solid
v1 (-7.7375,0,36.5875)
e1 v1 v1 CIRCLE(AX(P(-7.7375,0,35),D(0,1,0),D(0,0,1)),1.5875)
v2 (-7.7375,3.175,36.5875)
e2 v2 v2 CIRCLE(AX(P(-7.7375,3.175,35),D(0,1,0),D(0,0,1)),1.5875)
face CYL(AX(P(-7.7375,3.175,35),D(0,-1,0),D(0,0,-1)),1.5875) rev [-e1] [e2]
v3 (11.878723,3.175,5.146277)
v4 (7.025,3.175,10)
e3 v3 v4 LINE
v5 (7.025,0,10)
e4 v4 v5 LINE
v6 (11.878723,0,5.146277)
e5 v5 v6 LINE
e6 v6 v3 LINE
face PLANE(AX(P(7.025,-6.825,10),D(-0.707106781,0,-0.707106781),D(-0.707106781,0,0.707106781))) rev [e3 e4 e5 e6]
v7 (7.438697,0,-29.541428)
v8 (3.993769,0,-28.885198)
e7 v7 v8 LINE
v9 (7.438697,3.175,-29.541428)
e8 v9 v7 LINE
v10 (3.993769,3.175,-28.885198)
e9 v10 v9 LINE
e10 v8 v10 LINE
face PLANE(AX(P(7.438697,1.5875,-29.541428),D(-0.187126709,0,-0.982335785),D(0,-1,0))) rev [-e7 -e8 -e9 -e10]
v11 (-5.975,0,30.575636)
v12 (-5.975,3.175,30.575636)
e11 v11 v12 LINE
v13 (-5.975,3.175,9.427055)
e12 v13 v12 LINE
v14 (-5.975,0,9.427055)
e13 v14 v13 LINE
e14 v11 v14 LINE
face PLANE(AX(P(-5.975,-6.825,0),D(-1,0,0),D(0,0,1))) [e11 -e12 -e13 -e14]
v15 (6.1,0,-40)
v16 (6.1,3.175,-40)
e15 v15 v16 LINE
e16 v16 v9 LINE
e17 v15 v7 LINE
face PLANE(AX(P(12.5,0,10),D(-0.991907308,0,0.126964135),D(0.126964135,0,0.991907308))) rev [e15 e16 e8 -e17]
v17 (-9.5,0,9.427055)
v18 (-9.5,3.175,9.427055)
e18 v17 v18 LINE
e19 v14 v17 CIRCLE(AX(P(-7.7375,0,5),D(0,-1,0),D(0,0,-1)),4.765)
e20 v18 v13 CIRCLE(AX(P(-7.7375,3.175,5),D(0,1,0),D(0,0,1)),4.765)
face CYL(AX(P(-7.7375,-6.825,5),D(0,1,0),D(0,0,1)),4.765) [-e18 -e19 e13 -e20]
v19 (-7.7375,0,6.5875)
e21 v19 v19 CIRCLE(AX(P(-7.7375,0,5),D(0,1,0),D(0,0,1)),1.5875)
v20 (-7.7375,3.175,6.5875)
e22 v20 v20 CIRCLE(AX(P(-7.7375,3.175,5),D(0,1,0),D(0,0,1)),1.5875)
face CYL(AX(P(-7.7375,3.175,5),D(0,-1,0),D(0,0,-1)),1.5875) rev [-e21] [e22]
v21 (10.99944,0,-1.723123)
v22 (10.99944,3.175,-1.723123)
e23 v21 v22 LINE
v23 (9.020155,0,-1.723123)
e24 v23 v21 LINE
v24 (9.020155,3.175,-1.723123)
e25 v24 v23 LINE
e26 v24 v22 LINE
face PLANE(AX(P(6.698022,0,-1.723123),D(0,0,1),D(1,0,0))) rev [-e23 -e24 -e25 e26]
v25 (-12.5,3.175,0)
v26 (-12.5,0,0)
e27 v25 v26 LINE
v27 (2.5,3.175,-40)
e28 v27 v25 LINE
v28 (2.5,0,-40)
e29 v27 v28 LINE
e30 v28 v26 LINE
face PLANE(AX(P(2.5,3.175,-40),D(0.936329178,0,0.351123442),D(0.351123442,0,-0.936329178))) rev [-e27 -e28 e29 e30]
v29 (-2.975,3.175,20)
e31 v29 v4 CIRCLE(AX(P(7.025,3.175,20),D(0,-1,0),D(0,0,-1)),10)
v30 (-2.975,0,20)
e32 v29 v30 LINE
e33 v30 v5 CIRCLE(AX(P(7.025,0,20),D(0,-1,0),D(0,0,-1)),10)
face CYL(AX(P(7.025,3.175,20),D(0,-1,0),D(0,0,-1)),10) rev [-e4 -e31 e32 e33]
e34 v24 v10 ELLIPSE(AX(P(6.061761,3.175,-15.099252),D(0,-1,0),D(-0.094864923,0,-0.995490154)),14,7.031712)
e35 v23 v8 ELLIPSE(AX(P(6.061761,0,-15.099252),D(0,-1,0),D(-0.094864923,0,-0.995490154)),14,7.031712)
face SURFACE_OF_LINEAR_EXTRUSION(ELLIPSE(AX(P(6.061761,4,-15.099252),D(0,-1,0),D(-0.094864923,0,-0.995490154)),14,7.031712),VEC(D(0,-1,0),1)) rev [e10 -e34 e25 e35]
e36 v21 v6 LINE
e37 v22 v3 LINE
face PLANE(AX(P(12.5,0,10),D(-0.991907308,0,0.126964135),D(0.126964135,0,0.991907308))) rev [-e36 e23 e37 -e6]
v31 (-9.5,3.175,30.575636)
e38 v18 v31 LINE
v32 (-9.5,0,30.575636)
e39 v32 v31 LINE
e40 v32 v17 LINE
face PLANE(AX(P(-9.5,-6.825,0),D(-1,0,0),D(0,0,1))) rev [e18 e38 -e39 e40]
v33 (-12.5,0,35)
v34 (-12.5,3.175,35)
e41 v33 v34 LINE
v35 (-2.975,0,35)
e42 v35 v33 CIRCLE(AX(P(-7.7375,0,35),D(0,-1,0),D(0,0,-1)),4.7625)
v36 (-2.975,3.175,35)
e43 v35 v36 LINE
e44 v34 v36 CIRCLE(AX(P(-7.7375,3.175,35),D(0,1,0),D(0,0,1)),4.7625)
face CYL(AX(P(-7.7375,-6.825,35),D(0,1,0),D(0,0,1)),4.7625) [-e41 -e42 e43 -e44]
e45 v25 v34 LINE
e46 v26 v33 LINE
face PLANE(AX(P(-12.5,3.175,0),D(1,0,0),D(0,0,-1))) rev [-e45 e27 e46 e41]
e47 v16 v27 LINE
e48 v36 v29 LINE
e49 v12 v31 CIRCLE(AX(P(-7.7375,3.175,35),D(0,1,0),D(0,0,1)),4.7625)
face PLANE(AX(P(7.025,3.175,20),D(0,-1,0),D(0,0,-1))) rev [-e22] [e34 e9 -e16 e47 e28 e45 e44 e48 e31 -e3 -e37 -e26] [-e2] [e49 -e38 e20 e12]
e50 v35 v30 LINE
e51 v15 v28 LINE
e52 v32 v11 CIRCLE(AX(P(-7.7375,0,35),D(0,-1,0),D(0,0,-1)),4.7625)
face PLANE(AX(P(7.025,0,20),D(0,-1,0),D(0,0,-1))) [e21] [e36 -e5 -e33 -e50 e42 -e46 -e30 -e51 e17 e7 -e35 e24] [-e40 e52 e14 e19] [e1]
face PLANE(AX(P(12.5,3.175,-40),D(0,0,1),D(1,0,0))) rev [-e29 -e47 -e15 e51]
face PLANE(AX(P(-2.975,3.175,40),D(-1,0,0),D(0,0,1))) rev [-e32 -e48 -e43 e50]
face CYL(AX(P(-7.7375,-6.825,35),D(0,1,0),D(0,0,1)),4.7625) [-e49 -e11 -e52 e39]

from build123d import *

# Parameters (mm, degrees)
CROQUIS1_R                   = 1.5875
SALIENTE_EXTRUIR1_DEPTH      = 3.175
CORTAR_EXTRUIR1_DEPTH        = 3.175
CORTAR_EXTRUIR3_DEPTH        = 10
CROQUIS4_R                   = 10
CORTAR_EXTRUIR4_DEPTH        = 10
REDONDEO1_R                  = 2
ENL_V_MAT_EXTRU_1_DEPTH      = 43.027736377
ENL_V_MAT_EXTRU_1_DEPTH_BACK = 4
ESQUISSE1_RX                 = 14
ESQUISSE1_RY                 = 7.031711939
ESQUISSE2_W                  = 9.071953096
ESQUISSE2_H                  = 3.948156649
ENL_V_MAT_EXTRU_2_DEPTH      = 43.02773651
CHANFREIN1_START             = -27.627623392
CHANFREIN1_OUTLINE_W         = 3.506874848
CHANFREIN1_OUTLINE_H         = 3.175
CHANFREIN1_DEPTH             = 1.390086692
CHANFREIN1_START_2           = -27.652783734
CHANFREIN1_2_OUTLINE_W       = 3.506874848
CHANFREIN1_2_OUTLINE_H       = 3.175
CHANFREIN1_2_DEPTH           = 0.025160342


with BuildPart() as part:
    # Croquis1 → Saliente-Extruir1 (new body)
    with BuildSketch(Plane(origin=(0, 0, 0), x_dir=(1, 0, 0), z_dir=(0, 1, 0))):
        with BuildLine():
            Line((-12.5, 0), (-12.5, -40))
            Line((-12.5, -40), (-2.975, -40))
            Line((-2.975, -40), (-2.975, -20))
            ThreePointArc((-2.975, -20), (-0.046067812, -12.928932188), (7.025, -10))
            Line((7.025, -10), (12.5, -10))
            Line((12.5, -10), (12.5, 40))
            Line((12.5, 40), (2.5, 40))
            Line((2.5, 40), (-12.5, 0))
        make_face()
        with Locations(Location((-7.7375, -5, 0), (0, 0, 270))):
            Circle(CROQUIS1_R, mode=Mode.SUBTRACT)
        with Locations(Location((-7.7375, -35, 0), (0, 0, 270))):
            Circle(CROQUIS1_R, mode=Mode.SUBTRACT)
    extrude(amount=SALIENTE_EXTRUIR1_DEPTH)

    # Croquis2 → Cortar-Extruir1 (cut)
    with BuildSketch(Plane(origin=(0, 3.175, 0), x_dir=(1, 0, 0), z_dir=(0, 1, 0))):
        Polygon((12.5, -10), (6.1, 40), (12.5, 40), align=None)
    extrude(amount=-CORTAR_EXTRUIR1_DEPTH, mode=Mode.SUBTRACT)

    # Croquis3 → Cortar-Extruir3 (cut)
    with BuildSketch(Plane(origin=(0, 3.175, 0), x_dir=(1, 0, 0), z_dir=(0, 1, 0))):
        with BuildLine():
            ThreePointArc((-5.975, -30.575635639), (-7.7375, -30.2375), (-9.5, -30.575635639))
            Line((-9.5, -30.575635639), (-9.5, -9.427055314))
            ThreePointArc((-9.5, -9.427055314), (-7.7375, -9.765), (-5.975, -9.427055314))
            Line((-5.975, -9.427055314), (-5.975, -14.803847577))
            Line((-5.975, -14.803847577), (-5.975, -30.575635639))
        make_face()
        with BuildLine():
            ThreePointArc((-12.5, -35), (-7.7375, -39.7625), (-2.975, -35))
            Line((-2.975, -35), (-2.975, -40))
            Line((-2.975, -40), (-12.5, -40))
            Line((-12.5, -40), (-12.5, -35))
        make_face()
    extrude(amount=-CORTAR_EXTRUIR3_DEPTH, mode=Mode.SUBTRACT)

    # Croquis4 → Cortar-Extruir4 (cut)
    with BuildSketch(Plane(origin=(0, 3.175, 0), x_dir=(1, 0, 0), z_dir=(0, 1, 0))):
        with Locations((9.274103387, 15.202317292)):
            Circle(CROQUIS4_R)
        Polygon((7.025, -10), (11.878723404, -5.146276596), (12.5, -10), align=None)
    extrude(amount=-CORTAR_EXTRUIR4_DEPTH, mode=Mode.SUBTRACT)

    # Redondeo1
    redondeo1_edges = [part.edges().sort_by_distance(p)[0] for p in [
        (8.004462032, 1.5875, -25.121390375),
        (10.543744741, 1.5875, -5.283244209),
    ]]
    fillet(redondeo1_edges, radius=REDONDEO1_R)

    # Esquisse1 → Enlèv. mat.-Extru.1 (cut, two sides: drawn at the far end of the back side and taken through both)
    with BuildSketch(Plane.XZ.offset(-ENL_V_MAT_EXTRU_1_DEPTH_BACK)):
        with Locations(Location((6.06176106, -15.09925225), (0, 0, -95.443545347))):
            Ellipse(ESQUISSE1_RX, ESQUISSE1_RY)
    extrude(amount=ENL_V_MAT_EXTRU_1_DEPTH + ENL_V_MAT_EXTRU_1_DEPTH_BACK, mode=Mode.SUBTRACT)

    # Esquisse2 → Enlèv. mat.-Extru.2 (cut, through all)
    with BuildSketch(Plane(origin=(0, 3.175, 0), x_dir=(1, 0, 0), z_dir=(0, 1, 0))):
        with Locations((11.233998337, 3.697201044)):
            Rectangle(ESQUISSE2_W, ESQUISSE2_H)
    extrude(amount=-ENL_V_MAT_EXTRU_2_DEPTH, mode=Mode.SUBTRACT)

    # Chanfrein1: read off the stored shape, not the designer's step
    # Chanfrein1 outline → Chanfrein1 (cut)
    with BuildSketch(Plane(origin=(0, 0, 0), x_dir=(0.9823357851879482, 0, -0.18712670878091503), z_dir=(0.18712670878091503, 0, 0.9823357851879482)).offset(CHANFREIN1_START)):
        with Locations((11.081851268, 1.5875)):
            Rectangle(CHANFREIN1_OUTLINE_W, CHANFREIN1_OUTLINE_H)
    extrude(amount=CHANFREIN1_DEPTH, mode=Mode.SUBTRACT)

    # Chanfrein1 2 outline → Chanfrein1 2 (add)
    with BuildSketch(Plane(origin=(0, 0, 0), x_dir=(0.9823357851879482, 0, -0.18712670878091503), z_dir=(0.18712670878091503, 0, 0.9823357851879482)).offset(CHANFREIN1_START_2)):
        with Locations((11.081851268, 1.5875)):
            Rectangle(CHANFREIN1_2_OUTLINE_W, CHANFREIN1_2_OUTLINE_H)
    extrude(amount=CHANFREIN1_2_DEPTH)


solid = part.part
